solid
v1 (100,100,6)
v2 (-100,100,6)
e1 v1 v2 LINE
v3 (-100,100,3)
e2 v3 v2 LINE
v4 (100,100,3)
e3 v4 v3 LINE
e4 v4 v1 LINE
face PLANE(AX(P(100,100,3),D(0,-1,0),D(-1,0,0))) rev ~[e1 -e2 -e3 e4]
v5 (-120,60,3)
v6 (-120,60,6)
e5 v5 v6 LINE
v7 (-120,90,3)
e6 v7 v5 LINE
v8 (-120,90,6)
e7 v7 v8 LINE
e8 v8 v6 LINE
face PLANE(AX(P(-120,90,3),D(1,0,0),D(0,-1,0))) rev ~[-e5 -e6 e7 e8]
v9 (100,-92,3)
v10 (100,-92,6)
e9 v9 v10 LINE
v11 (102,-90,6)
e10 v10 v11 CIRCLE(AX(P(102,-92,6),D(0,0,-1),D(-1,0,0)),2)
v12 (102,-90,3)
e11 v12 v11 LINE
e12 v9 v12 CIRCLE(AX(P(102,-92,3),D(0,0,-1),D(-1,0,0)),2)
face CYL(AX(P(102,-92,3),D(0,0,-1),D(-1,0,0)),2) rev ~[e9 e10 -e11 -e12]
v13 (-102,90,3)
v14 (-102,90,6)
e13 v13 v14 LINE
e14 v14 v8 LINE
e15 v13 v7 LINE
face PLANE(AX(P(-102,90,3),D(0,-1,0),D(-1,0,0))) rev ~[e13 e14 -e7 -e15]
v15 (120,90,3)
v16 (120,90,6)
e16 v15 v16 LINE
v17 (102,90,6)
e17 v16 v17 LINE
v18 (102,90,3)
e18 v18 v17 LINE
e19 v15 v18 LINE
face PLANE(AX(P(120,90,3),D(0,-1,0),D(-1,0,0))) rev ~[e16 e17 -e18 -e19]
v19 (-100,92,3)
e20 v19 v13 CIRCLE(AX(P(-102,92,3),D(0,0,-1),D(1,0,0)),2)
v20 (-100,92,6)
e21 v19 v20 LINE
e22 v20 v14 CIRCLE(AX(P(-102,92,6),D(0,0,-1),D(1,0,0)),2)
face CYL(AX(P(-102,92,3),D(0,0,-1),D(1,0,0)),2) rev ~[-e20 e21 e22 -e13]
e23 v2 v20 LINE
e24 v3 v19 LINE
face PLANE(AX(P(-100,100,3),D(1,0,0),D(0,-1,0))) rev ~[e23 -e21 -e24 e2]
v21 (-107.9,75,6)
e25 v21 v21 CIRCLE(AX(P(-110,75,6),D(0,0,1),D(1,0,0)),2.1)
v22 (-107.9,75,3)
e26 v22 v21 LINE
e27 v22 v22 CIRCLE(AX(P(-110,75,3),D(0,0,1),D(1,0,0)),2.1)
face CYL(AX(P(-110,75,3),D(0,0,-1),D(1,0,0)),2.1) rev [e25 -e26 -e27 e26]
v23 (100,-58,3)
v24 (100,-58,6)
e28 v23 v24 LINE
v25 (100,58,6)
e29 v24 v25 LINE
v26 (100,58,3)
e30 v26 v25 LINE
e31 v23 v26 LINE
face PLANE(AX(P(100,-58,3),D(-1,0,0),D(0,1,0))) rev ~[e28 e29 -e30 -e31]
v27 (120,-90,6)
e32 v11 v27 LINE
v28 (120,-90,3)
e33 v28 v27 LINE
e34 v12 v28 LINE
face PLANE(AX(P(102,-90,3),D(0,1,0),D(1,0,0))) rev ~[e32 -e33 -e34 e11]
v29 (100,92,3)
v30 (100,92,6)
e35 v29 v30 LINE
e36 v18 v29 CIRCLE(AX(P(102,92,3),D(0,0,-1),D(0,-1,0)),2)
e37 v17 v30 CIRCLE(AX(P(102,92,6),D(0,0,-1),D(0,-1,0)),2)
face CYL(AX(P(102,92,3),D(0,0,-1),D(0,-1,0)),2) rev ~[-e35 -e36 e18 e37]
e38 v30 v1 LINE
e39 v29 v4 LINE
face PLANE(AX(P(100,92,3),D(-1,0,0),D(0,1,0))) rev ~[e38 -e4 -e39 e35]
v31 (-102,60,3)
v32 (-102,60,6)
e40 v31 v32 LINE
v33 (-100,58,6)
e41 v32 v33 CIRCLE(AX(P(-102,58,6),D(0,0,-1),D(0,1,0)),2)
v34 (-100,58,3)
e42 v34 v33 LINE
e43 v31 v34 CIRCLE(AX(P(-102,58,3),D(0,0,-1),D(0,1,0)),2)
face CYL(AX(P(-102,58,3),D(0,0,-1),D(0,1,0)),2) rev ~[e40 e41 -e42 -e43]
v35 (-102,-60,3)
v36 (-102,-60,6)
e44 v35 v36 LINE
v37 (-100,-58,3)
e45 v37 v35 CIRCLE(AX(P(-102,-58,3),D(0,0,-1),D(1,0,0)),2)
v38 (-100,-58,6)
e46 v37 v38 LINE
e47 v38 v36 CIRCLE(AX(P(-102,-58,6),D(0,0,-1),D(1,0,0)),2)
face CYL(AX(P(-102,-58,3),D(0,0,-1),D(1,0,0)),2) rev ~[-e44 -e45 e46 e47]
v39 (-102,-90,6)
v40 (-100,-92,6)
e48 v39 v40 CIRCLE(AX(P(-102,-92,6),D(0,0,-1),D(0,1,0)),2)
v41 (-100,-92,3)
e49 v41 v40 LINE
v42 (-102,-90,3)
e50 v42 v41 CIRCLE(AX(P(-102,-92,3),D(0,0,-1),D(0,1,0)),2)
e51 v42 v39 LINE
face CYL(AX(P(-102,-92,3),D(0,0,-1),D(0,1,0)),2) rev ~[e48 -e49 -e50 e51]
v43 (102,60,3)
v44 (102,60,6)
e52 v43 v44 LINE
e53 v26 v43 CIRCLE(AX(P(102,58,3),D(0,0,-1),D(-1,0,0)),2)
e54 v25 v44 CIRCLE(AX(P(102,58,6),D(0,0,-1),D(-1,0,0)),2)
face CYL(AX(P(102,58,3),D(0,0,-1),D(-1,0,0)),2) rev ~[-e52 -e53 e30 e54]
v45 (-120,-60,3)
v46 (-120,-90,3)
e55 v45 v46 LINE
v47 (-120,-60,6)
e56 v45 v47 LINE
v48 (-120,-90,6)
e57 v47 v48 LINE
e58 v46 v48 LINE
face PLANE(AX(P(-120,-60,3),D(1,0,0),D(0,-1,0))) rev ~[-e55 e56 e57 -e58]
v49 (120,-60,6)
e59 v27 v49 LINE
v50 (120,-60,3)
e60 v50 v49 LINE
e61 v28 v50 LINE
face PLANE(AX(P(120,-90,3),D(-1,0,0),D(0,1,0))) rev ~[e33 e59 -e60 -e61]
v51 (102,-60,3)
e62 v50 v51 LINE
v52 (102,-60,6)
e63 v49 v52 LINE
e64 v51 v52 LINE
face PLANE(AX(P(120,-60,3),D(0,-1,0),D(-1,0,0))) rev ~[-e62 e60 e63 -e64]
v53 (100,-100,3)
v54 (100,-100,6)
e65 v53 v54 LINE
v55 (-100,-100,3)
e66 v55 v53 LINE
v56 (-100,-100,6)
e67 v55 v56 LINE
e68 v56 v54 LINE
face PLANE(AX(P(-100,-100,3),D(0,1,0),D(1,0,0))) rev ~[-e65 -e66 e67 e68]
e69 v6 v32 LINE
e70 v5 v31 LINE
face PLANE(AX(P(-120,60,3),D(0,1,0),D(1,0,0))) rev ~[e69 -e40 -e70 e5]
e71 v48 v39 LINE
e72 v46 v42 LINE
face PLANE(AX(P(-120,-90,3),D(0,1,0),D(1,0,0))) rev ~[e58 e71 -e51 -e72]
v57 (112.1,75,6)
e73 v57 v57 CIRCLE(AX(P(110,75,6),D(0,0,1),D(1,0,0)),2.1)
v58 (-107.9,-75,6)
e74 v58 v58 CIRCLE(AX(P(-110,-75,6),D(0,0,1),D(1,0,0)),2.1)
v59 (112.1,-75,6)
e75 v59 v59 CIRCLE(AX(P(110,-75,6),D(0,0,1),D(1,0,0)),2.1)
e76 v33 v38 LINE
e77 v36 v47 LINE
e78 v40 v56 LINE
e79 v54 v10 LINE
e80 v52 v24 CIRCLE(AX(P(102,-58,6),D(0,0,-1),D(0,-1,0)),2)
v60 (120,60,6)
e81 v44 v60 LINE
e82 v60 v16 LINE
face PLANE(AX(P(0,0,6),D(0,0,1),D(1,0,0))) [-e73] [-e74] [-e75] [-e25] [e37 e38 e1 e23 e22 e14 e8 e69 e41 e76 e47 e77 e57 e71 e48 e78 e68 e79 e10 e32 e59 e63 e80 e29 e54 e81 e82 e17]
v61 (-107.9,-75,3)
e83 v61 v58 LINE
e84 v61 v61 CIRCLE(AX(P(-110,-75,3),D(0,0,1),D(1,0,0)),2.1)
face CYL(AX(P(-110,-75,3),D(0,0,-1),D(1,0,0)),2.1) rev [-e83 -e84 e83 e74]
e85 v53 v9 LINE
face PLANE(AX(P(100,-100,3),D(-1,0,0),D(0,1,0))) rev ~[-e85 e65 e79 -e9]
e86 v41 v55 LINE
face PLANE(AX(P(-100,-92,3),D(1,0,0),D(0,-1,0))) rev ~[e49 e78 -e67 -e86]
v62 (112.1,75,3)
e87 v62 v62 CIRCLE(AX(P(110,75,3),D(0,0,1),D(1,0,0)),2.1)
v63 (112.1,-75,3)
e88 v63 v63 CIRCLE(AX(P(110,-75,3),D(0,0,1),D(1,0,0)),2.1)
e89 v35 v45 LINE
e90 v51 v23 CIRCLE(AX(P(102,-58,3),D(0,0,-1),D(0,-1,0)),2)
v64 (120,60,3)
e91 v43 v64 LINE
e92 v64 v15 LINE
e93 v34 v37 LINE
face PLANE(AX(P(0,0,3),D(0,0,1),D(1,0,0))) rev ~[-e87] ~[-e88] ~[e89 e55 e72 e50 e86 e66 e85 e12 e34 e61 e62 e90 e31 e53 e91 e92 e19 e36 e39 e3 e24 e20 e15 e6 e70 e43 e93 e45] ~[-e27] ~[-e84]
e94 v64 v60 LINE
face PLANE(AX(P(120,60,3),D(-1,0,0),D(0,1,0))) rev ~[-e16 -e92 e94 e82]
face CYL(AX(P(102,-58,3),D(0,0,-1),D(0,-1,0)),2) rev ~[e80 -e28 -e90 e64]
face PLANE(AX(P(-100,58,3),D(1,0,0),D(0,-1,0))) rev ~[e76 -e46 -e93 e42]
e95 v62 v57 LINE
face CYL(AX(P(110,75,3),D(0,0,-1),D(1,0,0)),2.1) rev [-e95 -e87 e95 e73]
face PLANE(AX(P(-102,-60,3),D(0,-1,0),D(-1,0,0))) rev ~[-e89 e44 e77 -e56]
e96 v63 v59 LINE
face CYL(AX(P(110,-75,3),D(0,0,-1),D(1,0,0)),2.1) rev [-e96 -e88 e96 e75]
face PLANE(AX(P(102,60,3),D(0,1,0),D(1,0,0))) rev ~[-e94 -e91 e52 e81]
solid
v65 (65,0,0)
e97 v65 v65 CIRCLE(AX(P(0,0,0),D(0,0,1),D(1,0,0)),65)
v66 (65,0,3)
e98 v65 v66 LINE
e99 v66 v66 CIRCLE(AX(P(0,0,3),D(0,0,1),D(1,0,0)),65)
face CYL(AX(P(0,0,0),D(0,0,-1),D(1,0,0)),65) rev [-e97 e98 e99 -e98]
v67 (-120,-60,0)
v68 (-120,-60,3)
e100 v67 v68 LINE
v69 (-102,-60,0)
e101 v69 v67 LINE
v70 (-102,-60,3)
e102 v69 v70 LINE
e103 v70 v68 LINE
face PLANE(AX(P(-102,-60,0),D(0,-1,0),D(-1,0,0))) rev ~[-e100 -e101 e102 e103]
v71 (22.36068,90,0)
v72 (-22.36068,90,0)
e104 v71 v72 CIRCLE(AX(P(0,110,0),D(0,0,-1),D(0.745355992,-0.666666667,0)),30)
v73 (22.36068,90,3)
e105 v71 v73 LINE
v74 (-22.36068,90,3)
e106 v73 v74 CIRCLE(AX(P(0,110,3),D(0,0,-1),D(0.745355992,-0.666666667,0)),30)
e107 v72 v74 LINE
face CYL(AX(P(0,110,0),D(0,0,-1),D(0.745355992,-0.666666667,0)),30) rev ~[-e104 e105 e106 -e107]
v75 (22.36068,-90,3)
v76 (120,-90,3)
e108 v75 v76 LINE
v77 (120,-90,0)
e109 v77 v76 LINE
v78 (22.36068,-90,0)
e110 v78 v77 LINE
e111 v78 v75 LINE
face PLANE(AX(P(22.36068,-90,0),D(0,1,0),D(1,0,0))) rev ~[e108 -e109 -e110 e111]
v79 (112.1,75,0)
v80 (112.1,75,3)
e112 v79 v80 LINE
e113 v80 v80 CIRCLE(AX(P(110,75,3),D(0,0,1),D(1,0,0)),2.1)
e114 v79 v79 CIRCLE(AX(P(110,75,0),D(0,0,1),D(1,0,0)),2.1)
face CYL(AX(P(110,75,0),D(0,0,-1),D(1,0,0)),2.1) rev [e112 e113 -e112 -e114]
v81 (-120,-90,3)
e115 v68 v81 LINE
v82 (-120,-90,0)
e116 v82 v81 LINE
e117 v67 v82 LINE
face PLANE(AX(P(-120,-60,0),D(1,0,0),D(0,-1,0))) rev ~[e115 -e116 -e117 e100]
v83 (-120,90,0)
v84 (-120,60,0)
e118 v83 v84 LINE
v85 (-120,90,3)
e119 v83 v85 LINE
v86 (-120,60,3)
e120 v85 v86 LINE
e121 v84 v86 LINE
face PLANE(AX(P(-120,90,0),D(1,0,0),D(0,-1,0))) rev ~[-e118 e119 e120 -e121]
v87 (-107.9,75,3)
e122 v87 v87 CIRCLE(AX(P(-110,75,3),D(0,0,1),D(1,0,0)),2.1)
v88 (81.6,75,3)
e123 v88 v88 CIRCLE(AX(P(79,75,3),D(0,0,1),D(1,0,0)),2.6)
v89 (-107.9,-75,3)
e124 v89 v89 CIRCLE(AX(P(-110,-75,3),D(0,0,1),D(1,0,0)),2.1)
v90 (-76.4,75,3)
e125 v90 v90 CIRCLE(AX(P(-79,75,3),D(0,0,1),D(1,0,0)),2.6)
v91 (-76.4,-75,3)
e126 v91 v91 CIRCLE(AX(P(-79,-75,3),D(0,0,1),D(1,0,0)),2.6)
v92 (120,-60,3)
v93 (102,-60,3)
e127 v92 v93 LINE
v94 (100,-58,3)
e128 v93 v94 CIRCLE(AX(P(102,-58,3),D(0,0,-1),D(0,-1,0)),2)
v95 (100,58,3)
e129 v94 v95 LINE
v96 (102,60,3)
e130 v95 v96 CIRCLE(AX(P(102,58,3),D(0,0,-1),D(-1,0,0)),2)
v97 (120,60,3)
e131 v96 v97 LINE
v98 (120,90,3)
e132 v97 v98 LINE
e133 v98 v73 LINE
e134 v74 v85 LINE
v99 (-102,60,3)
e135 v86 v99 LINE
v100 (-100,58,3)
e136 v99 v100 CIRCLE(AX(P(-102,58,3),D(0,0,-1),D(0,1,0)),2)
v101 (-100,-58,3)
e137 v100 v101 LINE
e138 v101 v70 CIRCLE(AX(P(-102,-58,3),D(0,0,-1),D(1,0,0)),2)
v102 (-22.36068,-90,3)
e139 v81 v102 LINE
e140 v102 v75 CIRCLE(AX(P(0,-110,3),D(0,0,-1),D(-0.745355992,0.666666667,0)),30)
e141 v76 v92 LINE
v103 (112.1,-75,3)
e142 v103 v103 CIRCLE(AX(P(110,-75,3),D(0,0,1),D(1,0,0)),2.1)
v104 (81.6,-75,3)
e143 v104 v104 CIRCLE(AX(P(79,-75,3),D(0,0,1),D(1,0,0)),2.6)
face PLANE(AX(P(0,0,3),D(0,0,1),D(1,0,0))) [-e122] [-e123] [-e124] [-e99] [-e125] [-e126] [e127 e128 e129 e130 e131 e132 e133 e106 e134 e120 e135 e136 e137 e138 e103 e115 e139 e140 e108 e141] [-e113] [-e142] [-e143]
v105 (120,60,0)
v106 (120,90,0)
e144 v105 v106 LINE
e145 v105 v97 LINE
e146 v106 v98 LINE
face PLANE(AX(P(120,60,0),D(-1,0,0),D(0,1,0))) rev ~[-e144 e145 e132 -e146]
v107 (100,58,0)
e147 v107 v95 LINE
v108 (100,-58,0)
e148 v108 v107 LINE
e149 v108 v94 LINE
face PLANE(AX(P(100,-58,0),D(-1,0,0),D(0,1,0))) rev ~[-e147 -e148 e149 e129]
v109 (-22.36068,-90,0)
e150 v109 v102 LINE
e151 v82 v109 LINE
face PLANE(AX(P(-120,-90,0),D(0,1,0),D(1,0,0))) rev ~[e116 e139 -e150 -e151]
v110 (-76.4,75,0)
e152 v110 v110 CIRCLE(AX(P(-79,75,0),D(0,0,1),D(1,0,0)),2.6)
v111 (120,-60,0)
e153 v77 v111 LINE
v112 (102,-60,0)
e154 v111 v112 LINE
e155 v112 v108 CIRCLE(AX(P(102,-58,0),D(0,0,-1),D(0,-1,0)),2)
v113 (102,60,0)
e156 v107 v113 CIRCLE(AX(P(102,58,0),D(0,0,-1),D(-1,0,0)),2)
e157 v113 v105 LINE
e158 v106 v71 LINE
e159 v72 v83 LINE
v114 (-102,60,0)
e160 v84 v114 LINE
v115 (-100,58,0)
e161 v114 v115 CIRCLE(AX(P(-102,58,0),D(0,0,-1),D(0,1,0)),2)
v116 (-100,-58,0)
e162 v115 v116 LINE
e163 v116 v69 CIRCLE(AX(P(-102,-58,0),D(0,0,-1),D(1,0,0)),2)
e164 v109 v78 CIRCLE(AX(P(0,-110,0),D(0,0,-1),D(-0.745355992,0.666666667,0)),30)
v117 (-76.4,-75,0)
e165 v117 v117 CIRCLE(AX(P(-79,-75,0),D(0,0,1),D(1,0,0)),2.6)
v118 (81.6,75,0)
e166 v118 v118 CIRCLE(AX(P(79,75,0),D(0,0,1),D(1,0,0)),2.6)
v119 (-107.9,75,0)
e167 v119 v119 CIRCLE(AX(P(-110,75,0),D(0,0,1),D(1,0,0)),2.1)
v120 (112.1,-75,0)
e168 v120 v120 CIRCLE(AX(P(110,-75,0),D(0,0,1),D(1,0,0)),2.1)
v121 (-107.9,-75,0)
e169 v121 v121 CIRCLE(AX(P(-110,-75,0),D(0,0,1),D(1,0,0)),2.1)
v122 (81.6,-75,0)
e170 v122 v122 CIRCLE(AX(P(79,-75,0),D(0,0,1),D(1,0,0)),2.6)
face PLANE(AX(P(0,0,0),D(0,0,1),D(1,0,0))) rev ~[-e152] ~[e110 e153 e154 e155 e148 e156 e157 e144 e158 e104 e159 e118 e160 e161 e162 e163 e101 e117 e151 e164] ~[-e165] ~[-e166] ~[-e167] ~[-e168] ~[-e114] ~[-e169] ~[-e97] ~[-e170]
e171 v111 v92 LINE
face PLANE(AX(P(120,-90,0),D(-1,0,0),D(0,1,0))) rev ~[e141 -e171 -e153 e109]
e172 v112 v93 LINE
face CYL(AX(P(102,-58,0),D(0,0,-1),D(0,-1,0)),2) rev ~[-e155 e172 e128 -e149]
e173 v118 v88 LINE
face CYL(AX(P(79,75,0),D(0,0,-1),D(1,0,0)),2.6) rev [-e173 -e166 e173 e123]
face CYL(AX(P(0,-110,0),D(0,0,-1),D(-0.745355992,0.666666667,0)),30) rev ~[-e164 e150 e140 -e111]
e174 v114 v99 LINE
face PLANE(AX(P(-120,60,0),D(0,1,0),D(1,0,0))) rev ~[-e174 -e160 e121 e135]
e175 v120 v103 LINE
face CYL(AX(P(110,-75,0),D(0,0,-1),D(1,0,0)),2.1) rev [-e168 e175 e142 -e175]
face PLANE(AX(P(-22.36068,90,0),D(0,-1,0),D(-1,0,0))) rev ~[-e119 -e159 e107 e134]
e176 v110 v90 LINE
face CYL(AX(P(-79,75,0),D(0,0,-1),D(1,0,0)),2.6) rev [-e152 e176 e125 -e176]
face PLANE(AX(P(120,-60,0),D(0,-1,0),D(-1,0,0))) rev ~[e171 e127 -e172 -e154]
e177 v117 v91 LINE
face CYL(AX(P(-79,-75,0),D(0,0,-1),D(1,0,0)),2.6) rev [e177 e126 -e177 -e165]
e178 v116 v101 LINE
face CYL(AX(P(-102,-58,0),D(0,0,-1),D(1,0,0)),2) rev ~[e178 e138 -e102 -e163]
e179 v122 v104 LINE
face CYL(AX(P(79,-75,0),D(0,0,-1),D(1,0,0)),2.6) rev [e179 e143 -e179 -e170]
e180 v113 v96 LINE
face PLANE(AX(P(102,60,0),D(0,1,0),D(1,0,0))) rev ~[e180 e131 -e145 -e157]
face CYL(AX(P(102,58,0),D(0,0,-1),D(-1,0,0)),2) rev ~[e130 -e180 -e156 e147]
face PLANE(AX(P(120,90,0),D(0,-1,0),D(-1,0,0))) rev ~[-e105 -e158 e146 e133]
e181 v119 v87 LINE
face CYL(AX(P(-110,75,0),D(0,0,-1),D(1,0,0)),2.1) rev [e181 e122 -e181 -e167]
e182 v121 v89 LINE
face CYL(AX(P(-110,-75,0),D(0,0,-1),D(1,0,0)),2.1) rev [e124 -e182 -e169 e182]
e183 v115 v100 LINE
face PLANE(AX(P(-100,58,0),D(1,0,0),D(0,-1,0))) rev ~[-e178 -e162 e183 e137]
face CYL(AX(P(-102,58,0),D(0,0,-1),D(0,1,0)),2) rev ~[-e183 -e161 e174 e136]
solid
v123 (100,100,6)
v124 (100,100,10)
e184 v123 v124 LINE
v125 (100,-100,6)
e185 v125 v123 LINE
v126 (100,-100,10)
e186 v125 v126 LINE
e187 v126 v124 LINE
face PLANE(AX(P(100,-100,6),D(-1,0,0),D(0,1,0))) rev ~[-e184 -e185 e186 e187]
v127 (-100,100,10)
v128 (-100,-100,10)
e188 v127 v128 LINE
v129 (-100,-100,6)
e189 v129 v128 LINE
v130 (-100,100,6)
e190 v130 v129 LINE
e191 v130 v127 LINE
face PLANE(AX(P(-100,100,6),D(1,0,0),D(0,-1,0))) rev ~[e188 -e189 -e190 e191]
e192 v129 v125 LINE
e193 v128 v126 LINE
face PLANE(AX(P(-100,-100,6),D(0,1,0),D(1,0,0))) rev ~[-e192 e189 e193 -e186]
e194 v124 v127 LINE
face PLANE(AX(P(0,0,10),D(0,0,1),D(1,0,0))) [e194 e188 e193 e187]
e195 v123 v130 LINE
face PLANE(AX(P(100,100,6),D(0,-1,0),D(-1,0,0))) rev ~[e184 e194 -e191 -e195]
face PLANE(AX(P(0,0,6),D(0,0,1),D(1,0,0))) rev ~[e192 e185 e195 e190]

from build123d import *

# Parameters (mm, degrees)
F0_R     = 2.1
F0_R_2   = 2.6
F0_R_3   = 65
F1_DEPTH = 3
F2_R     = 2.1
F2_R_2   = 2.6
F2_R_3   = 65
F3_DEPTH = 3
F5_DEPTH = 4


with BuildPart() as f1:
    # F0 (on Top) → F1 (new body)
    with BuildSketch(Plane.XY):
        with BuildLine():
            Line((-120, -60), (-120, -90))
            Line((-120, -90), (-102, -90))
            Line((-102, -90), (-22.360679775, -90))
            ThreePointArc((-22.360679775, -90), (0, -80), (22.360679775, -90))
            Line((22.360679775, -90), (102, -90))
            Line((102, -90), (120, -90))
            Line((120, -90), (120, -60))
            Line((120, -60), (102, -60))
            ThreePointArc((102, -60), (100.5857864376, -59.4142135624), (100, -58))
            Line((100, -58), (100, 58))
            ThreePointArc((100, 58), (100.5857864376, 59.4142135624), (102, 60))
            Line((102, 60), (120, 60))
            Line((120, 60), (120, 90))
            Line((120, 90), (102, 90))
            Line((102, 90), (22.360679775, 90))
            ThreePointArc((22.360679775, 90), (0, 80), (-22.360679775, 90))
            Line((-22.360679775, 90), (-102, 90))
            Line((-102, 90), (-120, 90))
            Line((-120, 90), (-120, 60))
            Line((-120, 60), (-102, 60))
            ThreePointArc((-102, 60), (-100.5857864376, 59.4142135624), (-100, 58))
            Line((-100, 58), (-100, -58))
            ThreePointArc((-100, -58), (-100.5857864376, -59.4142135624), (-102, -60))
            Line((-102, -60), (-120, -60))
        make_face()
        with Locations((-110, -75)):
            Circle(F0_R, mode=Mode.SUBTRACT)
        with Locations((-79, -75)):
            Circle(F0_R_2, mode=Mode.SUBTRACT)
        with Locations((79, -75)):
            Circle(F0_R_2, mode=Mode.SUBTRACT)
        with Locations((110, -75)):
            Circle(F0_R, mode=Mode.SUBTRACT)
        with Locations((-110, 75)):
            Circle(F0_R, mode=Mode.SUBTRACT)
        with Locations((-79, 75)):
            Circle(F0_R_2, mode=Mode.SUBTRACT)
        Circle(F0_R_3, mode=Mode.SUBTRACT)
        with Locations((79, 75)):
            Circle(F0_R_2, mode=Mode.SUBTRACT)
        with Locations((110, 75)):
            Circle(F0_R, mode=Mode.SUBTRACT)
    extrude(amount=F1_DEPTH)


with BuildPart() as f3:
    # F2 (on face) → F3 (new body)
    with BuildSketch(Plane.XY.offset(3)):
        with BuildLine():
            Line((-22.360679775, 90), (-102, 90))
            Line((-102, 90), (-120, 90))
            Line((-120, 90), (-120, 60))
            Line((-120, 60), (-102, 60))
            ThreePointArc((-102, 60), (-100.5857864376, 59.4142135624), (-100, 58))
            Line((-100, 58), (-100, -58))
            ThreePointArc((-100, -58), (-100.5857864376, -59.4142135624), (-102, -60))
            Line((-102, -60), (-120, -60))
            Line((-120, -60), (-120, -90))
            Line((-120, -90), (-102, -90))
            Line((-102, -90), (-22.360679775, -90))
            ThreePointArc((-22.360679775, -90), (0, -80), (22.360679775, -90))
            Line((22.360679775, -90), (102, -90))
            Line((102, -90), (120, -90))
            Line((120, -90), (120, -60))
            Line((120, -60), (102, -60))
            ThreePointArc((102, -60), (100.5857864376, -59.4142135624), (100, -58))
            Line((100, -58), (100, 58))
            ThreePointArc((100, 58), (100.5857864376, 59.4142135624), (102, 60))
            Line((102, 60), (120, 60))
            Line((120, 60), (120, 90))
            Line((120, 90), (102, 90))
            Line((102, 90), (22.360679775, 90))
            ThreePointArc((22.360679775, 90), (0, 80), (-22.360679775, 90))
        make_face()
        with Locations((-110, -75)):
            Circle(F2_R, mode=Mode.SUBTRACT)
        with Locations((-79, -75)):
            Circle(F2_R_2, mode=Mode.SUBTRACT)
        with Locations((79, -75)):
            Circle(F2_R_2, mode=Mode.SUBTRACT)
        with Locations((110, -75)):
            Circle(F2_R, mode=Mode.SUBTRACT)
        with Locations((-110, 75)):
            Circle(F2_R, mode=Mode.SUBTRACT)
        with Locations((-79, 75)):
            Circle(F2_R_2, mode=Mode.SUBTRACT)
        Circle(F2_R_3, mode=Mode.SUBTRACT)
        with Locations((79, 75)):
            Circle(F2_R_2, mode=Mode.SUBTRACT)
        with Locations((110, 75)):
            Circle(F2_R, mode=Mode.SUBTRACT)
        with BuildLine():
            Line((100, 100), (-100, 100))
            Line((-100, 100), (-100, 92))
            ThreePointArc((-100, 92), (-100.5857864376, 90.5857864376), (-102, 90))
            Line((-102, 90), (-22.360679775, 90))
            ThreePointArc((-22.360679775, 90), (0, 80), (22.360679775, 90))
            Line((22.360679775, 90), (102, 90))
            ThreePointArc((102, 90), (100.5857864376, 90.5857864376), (100, 92))
            Line((100, 92), (100, 100))
        make_face()
        with Locations((-79, 75)):
            Circle(F2_R_2)
        Circle(F2_R_3)
        with Locations((79, 75)):
            Circle(F2_R_2)
        with Locations((79, -75)):
            Circle(F2_R_2)
        with BuildLine():
            Line((-22.360679775, -90), (-102, -90))
            ThreePointArc((-102, -90), (-100.5857864376, -90.5857864376), (-100, -92))
            Line((-100, -92), (-100, -100))
            Line((-100, -100), (100, -100))
            Line((100, -100), (100, -92))
            ThreePointArc((100, -92), (100.5857864376, -90.5857864376), (102, -90))
            Line((102, -90), (22.360679775, -90))
            ThreePointArc((22.360679775, -90), (0, -80), (-22.360679775, -90))
        make_face()
        with Locations((-79, -75)):
            Circle(F2_R_2)
    extrude(amount=F3_DEPTH)


with BuildPart() as f5:
    # F4 (on face) → F5 (new body)
    with BuildSketch(Plane.XY.offset(6)):
        Polygon((100, 100), (-100, 100), (-100, 92), (-100, 58), (-100, -58), (-100, -92), (-100, -100), (100, -100), (100, -92), (100, -58), (100, 58), (100, 92), align=None)
    extrude(amount=F5_DEPTH)


solid = Compound([f1.part, f3.part, f5.part])
